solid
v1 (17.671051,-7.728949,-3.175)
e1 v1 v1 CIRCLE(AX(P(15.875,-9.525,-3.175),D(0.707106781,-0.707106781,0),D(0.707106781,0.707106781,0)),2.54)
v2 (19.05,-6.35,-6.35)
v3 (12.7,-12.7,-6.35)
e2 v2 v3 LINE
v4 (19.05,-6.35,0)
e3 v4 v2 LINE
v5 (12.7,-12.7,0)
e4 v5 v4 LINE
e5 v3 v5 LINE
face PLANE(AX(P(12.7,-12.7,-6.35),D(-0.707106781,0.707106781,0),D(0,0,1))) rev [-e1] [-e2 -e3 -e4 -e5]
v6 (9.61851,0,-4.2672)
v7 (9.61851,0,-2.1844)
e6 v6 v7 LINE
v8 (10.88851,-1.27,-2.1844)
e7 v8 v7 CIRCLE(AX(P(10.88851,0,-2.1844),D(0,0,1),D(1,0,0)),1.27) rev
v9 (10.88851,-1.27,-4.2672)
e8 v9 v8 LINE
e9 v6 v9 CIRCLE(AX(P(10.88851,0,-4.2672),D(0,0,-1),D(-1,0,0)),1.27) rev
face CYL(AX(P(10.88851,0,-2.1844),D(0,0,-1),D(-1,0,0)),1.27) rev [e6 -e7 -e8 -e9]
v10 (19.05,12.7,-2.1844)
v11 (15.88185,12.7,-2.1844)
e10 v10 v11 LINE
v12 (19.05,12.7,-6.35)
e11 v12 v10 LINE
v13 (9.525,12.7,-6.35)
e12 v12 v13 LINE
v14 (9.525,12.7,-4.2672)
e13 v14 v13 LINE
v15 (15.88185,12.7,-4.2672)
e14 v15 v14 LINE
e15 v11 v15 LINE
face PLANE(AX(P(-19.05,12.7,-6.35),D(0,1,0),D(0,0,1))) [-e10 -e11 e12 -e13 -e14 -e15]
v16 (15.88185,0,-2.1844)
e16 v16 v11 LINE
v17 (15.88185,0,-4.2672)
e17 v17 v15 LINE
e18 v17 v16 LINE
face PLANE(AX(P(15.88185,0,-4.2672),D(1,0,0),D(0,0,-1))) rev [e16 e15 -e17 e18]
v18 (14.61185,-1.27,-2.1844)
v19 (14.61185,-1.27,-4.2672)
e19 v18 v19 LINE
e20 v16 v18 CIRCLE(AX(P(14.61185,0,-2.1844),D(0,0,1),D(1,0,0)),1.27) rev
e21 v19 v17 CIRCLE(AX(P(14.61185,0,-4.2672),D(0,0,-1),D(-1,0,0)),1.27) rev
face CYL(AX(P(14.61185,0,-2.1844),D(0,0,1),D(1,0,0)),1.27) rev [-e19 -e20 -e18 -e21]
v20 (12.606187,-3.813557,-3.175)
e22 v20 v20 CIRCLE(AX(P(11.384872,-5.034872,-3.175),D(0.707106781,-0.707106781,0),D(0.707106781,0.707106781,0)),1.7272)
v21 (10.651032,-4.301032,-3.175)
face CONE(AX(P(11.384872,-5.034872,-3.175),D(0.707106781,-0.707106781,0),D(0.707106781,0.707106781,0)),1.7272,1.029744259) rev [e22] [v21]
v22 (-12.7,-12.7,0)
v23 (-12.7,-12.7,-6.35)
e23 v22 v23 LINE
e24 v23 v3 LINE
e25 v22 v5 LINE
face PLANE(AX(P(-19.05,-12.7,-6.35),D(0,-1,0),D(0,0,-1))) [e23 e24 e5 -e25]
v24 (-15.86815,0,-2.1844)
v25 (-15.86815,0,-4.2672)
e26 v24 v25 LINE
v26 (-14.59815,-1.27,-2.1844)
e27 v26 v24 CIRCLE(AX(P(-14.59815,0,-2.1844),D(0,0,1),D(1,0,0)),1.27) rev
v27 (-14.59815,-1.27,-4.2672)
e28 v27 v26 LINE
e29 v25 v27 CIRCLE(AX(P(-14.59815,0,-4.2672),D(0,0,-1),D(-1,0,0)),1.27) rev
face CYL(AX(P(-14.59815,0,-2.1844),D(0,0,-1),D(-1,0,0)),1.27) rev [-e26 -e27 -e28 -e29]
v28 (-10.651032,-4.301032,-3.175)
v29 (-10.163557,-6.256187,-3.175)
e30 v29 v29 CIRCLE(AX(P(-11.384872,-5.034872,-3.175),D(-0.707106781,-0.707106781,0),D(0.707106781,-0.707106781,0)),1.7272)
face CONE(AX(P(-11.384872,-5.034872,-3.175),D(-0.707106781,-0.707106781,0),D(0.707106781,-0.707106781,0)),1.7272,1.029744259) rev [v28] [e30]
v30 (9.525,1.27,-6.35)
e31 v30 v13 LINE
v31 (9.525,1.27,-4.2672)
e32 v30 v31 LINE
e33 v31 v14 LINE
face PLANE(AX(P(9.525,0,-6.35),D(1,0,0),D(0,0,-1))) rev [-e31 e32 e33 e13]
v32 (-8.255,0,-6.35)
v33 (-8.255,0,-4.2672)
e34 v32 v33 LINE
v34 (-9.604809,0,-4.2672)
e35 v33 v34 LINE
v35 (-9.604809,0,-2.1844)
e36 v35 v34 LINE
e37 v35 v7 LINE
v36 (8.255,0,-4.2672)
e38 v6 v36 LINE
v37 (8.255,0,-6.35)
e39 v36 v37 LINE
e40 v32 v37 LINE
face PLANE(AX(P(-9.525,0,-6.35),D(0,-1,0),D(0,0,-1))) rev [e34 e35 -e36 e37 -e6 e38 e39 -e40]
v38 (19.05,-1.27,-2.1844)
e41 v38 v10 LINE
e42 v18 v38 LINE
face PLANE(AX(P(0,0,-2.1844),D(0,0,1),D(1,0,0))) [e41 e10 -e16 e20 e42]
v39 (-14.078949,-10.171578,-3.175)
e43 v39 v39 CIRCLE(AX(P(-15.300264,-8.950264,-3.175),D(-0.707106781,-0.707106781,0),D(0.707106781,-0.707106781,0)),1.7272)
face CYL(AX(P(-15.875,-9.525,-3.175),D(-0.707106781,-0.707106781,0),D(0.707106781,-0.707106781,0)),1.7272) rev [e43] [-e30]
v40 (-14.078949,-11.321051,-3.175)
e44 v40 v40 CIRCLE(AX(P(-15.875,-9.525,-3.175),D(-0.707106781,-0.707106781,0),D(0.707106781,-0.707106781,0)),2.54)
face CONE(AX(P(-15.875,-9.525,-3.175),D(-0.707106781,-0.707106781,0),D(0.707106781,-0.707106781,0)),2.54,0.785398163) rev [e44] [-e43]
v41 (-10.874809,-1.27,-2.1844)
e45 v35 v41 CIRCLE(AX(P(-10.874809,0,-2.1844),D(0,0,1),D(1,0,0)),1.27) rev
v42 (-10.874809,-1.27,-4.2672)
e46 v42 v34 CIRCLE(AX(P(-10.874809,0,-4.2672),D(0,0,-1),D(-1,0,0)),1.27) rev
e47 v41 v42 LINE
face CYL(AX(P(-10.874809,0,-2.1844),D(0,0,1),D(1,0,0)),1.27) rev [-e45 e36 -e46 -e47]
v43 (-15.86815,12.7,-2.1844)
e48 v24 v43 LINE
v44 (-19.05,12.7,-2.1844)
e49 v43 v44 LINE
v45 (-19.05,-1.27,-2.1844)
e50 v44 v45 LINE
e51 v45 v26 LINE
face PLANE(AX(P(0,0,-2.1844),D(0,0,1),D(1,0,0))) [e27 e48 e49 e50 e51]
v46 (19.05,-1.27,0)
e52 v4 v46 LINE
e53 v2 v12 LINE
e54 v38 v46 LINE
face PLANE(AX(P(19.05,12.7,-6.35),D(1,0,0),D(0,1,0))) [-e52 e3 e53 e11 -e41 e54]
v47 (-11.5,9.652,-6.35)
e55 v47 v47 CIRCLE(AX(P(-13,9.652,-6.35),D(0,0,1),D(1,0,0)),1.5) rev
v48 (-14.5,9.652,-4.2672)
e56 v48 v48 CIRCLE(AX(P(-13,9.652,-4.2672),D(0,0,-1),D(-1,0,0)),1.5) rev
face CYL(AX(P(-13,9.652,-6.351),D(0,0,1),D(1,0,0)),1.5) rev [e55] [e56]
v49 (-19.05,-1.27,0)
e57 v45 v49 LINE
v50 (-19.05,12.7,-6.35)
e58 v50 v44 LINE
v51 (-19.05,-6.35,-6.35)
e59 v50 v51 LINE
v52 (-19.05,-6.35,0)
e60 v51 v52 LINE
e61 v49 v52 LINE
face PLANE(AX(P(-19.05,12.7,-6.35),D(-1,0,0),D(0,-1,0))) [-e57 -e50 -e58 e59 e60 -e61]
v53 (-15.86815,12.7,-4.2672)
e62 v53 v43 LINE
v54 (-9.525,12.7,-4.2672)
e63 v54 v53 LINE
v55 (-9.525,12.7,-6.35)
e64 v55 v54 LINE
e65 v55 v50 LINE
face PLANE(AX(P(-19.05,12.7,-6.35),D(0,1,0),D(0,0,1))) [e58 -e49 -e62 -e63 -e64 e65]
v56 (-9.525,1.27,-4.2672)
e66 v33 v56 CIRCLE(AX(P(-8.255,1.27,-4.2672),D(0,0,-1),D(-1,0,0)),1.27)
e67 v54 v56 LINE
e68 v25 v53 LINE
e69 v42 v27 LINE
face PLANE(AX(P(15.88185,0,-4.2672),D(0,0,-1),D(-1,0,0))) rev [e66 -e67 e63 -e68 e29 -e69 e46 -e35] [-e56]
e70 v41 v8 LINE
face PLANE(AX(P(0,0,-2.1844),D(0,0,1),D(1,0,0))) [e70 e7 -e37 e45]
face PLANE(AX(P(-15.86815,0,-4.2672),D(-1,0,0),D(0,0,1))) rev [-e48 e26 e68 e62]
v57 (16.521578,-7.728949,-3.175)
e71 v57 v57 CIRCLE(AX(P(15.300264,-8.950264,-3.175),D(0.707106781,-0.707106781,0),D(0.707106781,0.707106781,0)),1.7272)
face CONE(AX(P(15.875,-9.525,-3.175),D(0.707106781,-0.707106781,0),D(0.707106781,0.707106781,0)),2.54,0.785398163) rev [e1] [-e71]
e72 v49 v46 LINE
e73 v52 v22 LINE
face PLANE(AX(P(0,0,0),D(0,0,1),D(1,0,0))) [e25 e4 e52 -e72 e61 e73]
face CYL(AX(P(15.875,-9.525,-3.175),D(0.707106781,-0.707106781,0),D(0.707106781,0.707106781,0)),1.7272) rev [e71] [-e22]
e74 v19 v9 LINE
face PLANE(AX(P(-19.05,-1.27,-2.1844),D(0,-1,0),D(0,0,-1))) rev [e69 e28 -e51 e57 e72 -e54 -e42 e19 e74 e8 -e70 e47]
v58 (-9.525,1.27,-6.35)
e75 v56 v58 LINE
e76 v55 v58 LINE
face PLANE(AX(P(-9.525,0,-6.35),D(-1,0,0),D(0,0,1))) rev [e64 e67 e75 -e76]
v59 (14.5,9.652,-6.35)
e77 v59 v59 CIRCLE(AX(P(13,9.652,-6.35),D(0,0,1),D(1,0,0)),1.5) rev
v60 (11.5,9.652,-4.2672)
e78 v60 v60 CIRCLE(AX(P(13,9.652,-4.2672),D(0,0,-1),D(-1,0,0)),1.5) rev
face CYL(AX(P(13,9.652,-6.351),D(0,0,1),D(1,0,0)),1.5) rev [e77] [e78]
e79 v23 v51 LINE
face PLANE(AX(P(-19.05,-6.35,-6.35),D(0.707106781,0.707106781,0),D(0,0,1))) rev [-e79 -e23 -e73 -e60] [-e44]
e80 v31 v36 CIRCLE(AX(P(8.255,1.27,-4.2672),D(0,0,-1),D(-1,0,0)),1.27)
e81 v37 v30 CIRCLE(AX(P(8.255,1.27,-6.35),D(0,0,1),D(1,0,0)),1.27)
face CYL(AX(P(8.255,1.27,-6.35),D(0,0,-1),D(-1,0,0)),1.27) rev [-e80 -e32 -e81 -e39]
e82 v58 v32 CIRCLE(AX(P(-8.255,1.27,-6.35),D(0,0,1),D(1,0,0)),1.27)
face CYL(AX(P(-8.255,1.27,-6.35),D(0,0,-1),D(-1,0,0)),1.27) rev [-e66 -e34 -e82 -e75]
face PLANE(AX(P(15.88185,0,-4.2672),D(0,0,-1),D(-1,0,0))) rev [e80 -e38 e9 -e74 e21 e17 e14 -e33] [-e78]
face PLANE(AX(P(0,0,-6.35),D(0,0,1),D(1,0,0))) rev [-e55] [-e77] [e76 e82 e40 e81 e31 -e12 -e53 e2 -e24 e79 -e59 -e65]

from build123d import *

# Parameters (mm, degrees)
SKETCH1_W                       = 38.1
SKETCH1_H                       = 25.4
BOSS_EXTRUDE1_DEPTH             = 6.35
SKETCH3_W                       = 38.1
SKETCH3_H                       = 13.97
CUT_EXTRUDE1_DEPTH              = 2.1844
SKETCH4_R                       = 1.27
CUT_EXTRUDE2_DEPTH              = 24.271113496
SKETCH6_W                       = 19.05
SKETCH6_H                       = 19.05
CUT_EXTRUDE5_DEPTH              = 24.759524406
SKETCH7_W                       = 31.75
SKETCH7_H                       = 2.0828
CUT_EXTRUDE6_DEPTH              = 12.7
CUT_EXTRUDE9_REACH              = 25.271
SKETCH10_R                      = 1.5
SKETCH15_W                      = 6.263340786
SKETCH15_H                      = 2.0828
CUT_EXTRUDE14_DEPTH             = 1.27
FILLET7_R                       = 1.27
CHAMFER10_SIZE                  = 6.35
F_8_32_TAPPED_HOLE2_D           = 3.4544
F_8_32_TAPPED_HOLE2_DEPTH       = 6.35
F_8_32_TAPPED_HOLE2_CSINK_D     = 5.08
F_8_32_TAPPED_HOLE2_CSINK_ANGLE = 90
F_8_32_TAPPED_HOLE2_TIP         = 1.037806461
F_8_32_TAPPED_HOLE3_D           = 3.4544
F_8_32_TAPPED_HOLE3_DEPTH       = 6.35
F_8_32_TAPPED_HOLE3_CSINK_D     = 5.08
F_8_32_TAPPED_HOLE3_CSINK_ANGLE = 90
F_8_32_TAPPED_HOLE3_TIP         = 1.037806461


with BuildPart() as part:
    # Sketch1 → Boss-Extrude1 (new body)
    with BuildSketch(Plane.XY):
        Rectangle(SKETCH1_W, SKETCH1_H)
    extrude(amount=-BOSS_EXTRUDE1_DEPTH)

    # Sketch3 → Cut-Extrude1 (cut)
    with BuildSketch(Plane.XY):
        with Locations((0, 5.715)):
            Rectangle(SKETCH3_W, SKETCH3_H)
    extrude(amount=-CUT_EXTRUDE1_DEPTH, mode=Mode.SUBTRACT)

    # Sketch4 → Cut-Extrude2 (cut, through all)
    with BuildSketch(Plane.XY.offset(-2.1844)):
        with Locations((-13, 9.652)):
            Circle(SKETCH4_R)
        with Locations(Location((13, 9.652, 0), (0, 0, 180))):
            Circle(SKETCH4_R)
    extrude(amount=-CUT_EXTRUDE2_DEPTH, mode=Mode.SUBTRACT)

    # Sketch6 → Cut-Extrude5 (cut, through all)
    with BuildSketch(Plane.XY):
        with Locations((0, 9.525)):
            Rectangle(SKETCH6_W, SKETCH6_H)
    extrude(amount=-CUT_EXTRUDE5_DEPTH, mode=Mode.SUBTRACT)

    # Sketch7 → Cut-Extrude6 (cut)
    with BuildSketch(Plane(origin=(0, 12.7, 0), x_dir=(1, 0, 0), z_dir=(0, 1, 0))):
        with Locations((0.006850314, 3.2258)):
            Rectangle(SKETCH7_W, SKETCH7_H)
    extrude(amount=-CUT_EXTRUDE6_DEPTH, mode=Mode.SUBTRACT)

    # Sketch10 → Cut-Extrude9 (cut, up to next)
    with BuildSketch(Plane.XY.offset(-2.1844), mode=Mode.PRIVATE) as cut_extrude9_sk1:
        with Locations((-13, 9.652)):
            Circle(SKETCH10_R)
    cut_extrude9_tool1 = extrude(cut_extrude9_sk1.sketch, amount=-CUT_EXTRUDE9_REACH, mode=Mode.PRIVATE) & part.part
    # Sketch10 → Cut-Extrude9 (cut, up to next)
    with BuildSketch(Plane.XY.offset(-2.1844), mode=Mode.PRIVATE) as cut_extrude9_sk2:
        with Locations((13, 9.652)):
            Circle(SKETCH10_R)
    cut_extrude9_tool2 = extrude(cut_extrude9_sk2.sketch, amount=-CUT_EXTRUDE9_REACH, mode=Mode.PRIVATE) & part.part
    add(cut_extrude9_tool1.solids().sort_by_distance((-13, 9.652, -2.1844))[0], mode=Mode.SUBTRACT)
    add(cut_extrude9_tool2.solids().sort_by_distance((13, 9.652, -2.1844))[0], mode=Mode.SUBTRACT)

    # Sketch15 → Cut-Extrude14 (cut)
    with BuildSketch(Plane(origin=(0, 0, 0), x_dir=(1, 0, 0), z_dir=(0, 1, 0))):
        with Locations((-12.736479293, 3.2258)):
            Rectangle(SKETCH15_W, SKETCH15_H)
        with Locations((12.750179921, 3.2258)):
            Rectangle(SKETCH15_W, SKETCH15_H)
    extrude(amount=-CUT_EXTRUDE14_DEPTH, mode=Mode.SUBTRACT)

    # Fillet7
    fillet7_edges = [part.edges().sort_by_distance(p)[0] for p in [
        (15.881850314, -1.27, -3.2258),
        (-15.868149686, -1.27, -3.2258),
        (-9.525, 0, -5.3086),
        (9.525, 0, -5.3086),
        (-9.6048089, -1.27, -3.2258),
        (9.618509528, -1.27, -3.2258),
    ]]
    fillet(fillet7_edges, radius=FILLET7_R - 0.0001)  # a hair under: the kernel refuses the full size

    # Chamfer10
    chamfer10_edges = [part.edges().sort_by_distance(p)[0] for p in [
        (19.05, -12.7, -3.175),
        (-19.05, -12.7, -3.175),
    ]]
    chamfer(chamfer10_edges, length=CHAMFER10_SIZE)

    # #8-32 Tapped Hole2
    with Locations(Plane(origin=(-12.7, -12.7, 0), x_dir=(-0.7071067811865487, 0.7071067811865465, 0), z_dir=(-0.7071067811865465, -0.7071067811865487, 0))):
        with Locations((4.490128061, 3.175)):
            CounterSinkHole(F_8_32_TAPPED_HOLE2_D / 2, F_8_32_TAPPED_HOLE2_CSINK_D / 2, depth=F_8_32_TAPPED_HOLE2_DEPTH, counter_sink_angle=F_8_32_TAPPED_HOLE2_CSINK_ANGLE)
            with Locations((0, 0, -(F_8_32_TAPPED_HOLE2_DEPTH + F_8_32_TAPPED_HOLE2_TIP / 2))):  # 118° drill point
                Cone(0, F_8_32_TAPPED_HOLE2_D / 2, F_8_32_TAPPED_HOLE2_TIP, mode=Mode.SUBTRACT)

    # #8-32 Tapped Hole3
    with Locations(Plane(origin=(12.7, -12.7, 0), x_dir=(0, 0, -1), z_dir=(0.707106781186549, -0.7071067811865461, 0))):
        with Locations((3.175, 4.490128061)):
            CounterSinkHole(F_8_32_TAPPED_HOLE3_D / 2, F_8_32_TAPPED_HOLE3_CSINK_D / 2, depth=F_8_32_TAPPED_HOLE3_DEPTH, counter_sink_angle=F_8_32_TAPPED_HOLE3_CSINK_ANGLE)
            with Locations((0, 0, -(F_8_32_TAPPED_HOLE3_DEPTH + F_8_32_TAPPED_HOLE3_TIP / 2))):  # 118° drill point
                Cone(0, F_8_32_TAPPED_HOLE3_D / 2, F_8_32_TAPPED_HOLE3_TIP, mode=Mode.SUBTRACT)


solid = part.part
